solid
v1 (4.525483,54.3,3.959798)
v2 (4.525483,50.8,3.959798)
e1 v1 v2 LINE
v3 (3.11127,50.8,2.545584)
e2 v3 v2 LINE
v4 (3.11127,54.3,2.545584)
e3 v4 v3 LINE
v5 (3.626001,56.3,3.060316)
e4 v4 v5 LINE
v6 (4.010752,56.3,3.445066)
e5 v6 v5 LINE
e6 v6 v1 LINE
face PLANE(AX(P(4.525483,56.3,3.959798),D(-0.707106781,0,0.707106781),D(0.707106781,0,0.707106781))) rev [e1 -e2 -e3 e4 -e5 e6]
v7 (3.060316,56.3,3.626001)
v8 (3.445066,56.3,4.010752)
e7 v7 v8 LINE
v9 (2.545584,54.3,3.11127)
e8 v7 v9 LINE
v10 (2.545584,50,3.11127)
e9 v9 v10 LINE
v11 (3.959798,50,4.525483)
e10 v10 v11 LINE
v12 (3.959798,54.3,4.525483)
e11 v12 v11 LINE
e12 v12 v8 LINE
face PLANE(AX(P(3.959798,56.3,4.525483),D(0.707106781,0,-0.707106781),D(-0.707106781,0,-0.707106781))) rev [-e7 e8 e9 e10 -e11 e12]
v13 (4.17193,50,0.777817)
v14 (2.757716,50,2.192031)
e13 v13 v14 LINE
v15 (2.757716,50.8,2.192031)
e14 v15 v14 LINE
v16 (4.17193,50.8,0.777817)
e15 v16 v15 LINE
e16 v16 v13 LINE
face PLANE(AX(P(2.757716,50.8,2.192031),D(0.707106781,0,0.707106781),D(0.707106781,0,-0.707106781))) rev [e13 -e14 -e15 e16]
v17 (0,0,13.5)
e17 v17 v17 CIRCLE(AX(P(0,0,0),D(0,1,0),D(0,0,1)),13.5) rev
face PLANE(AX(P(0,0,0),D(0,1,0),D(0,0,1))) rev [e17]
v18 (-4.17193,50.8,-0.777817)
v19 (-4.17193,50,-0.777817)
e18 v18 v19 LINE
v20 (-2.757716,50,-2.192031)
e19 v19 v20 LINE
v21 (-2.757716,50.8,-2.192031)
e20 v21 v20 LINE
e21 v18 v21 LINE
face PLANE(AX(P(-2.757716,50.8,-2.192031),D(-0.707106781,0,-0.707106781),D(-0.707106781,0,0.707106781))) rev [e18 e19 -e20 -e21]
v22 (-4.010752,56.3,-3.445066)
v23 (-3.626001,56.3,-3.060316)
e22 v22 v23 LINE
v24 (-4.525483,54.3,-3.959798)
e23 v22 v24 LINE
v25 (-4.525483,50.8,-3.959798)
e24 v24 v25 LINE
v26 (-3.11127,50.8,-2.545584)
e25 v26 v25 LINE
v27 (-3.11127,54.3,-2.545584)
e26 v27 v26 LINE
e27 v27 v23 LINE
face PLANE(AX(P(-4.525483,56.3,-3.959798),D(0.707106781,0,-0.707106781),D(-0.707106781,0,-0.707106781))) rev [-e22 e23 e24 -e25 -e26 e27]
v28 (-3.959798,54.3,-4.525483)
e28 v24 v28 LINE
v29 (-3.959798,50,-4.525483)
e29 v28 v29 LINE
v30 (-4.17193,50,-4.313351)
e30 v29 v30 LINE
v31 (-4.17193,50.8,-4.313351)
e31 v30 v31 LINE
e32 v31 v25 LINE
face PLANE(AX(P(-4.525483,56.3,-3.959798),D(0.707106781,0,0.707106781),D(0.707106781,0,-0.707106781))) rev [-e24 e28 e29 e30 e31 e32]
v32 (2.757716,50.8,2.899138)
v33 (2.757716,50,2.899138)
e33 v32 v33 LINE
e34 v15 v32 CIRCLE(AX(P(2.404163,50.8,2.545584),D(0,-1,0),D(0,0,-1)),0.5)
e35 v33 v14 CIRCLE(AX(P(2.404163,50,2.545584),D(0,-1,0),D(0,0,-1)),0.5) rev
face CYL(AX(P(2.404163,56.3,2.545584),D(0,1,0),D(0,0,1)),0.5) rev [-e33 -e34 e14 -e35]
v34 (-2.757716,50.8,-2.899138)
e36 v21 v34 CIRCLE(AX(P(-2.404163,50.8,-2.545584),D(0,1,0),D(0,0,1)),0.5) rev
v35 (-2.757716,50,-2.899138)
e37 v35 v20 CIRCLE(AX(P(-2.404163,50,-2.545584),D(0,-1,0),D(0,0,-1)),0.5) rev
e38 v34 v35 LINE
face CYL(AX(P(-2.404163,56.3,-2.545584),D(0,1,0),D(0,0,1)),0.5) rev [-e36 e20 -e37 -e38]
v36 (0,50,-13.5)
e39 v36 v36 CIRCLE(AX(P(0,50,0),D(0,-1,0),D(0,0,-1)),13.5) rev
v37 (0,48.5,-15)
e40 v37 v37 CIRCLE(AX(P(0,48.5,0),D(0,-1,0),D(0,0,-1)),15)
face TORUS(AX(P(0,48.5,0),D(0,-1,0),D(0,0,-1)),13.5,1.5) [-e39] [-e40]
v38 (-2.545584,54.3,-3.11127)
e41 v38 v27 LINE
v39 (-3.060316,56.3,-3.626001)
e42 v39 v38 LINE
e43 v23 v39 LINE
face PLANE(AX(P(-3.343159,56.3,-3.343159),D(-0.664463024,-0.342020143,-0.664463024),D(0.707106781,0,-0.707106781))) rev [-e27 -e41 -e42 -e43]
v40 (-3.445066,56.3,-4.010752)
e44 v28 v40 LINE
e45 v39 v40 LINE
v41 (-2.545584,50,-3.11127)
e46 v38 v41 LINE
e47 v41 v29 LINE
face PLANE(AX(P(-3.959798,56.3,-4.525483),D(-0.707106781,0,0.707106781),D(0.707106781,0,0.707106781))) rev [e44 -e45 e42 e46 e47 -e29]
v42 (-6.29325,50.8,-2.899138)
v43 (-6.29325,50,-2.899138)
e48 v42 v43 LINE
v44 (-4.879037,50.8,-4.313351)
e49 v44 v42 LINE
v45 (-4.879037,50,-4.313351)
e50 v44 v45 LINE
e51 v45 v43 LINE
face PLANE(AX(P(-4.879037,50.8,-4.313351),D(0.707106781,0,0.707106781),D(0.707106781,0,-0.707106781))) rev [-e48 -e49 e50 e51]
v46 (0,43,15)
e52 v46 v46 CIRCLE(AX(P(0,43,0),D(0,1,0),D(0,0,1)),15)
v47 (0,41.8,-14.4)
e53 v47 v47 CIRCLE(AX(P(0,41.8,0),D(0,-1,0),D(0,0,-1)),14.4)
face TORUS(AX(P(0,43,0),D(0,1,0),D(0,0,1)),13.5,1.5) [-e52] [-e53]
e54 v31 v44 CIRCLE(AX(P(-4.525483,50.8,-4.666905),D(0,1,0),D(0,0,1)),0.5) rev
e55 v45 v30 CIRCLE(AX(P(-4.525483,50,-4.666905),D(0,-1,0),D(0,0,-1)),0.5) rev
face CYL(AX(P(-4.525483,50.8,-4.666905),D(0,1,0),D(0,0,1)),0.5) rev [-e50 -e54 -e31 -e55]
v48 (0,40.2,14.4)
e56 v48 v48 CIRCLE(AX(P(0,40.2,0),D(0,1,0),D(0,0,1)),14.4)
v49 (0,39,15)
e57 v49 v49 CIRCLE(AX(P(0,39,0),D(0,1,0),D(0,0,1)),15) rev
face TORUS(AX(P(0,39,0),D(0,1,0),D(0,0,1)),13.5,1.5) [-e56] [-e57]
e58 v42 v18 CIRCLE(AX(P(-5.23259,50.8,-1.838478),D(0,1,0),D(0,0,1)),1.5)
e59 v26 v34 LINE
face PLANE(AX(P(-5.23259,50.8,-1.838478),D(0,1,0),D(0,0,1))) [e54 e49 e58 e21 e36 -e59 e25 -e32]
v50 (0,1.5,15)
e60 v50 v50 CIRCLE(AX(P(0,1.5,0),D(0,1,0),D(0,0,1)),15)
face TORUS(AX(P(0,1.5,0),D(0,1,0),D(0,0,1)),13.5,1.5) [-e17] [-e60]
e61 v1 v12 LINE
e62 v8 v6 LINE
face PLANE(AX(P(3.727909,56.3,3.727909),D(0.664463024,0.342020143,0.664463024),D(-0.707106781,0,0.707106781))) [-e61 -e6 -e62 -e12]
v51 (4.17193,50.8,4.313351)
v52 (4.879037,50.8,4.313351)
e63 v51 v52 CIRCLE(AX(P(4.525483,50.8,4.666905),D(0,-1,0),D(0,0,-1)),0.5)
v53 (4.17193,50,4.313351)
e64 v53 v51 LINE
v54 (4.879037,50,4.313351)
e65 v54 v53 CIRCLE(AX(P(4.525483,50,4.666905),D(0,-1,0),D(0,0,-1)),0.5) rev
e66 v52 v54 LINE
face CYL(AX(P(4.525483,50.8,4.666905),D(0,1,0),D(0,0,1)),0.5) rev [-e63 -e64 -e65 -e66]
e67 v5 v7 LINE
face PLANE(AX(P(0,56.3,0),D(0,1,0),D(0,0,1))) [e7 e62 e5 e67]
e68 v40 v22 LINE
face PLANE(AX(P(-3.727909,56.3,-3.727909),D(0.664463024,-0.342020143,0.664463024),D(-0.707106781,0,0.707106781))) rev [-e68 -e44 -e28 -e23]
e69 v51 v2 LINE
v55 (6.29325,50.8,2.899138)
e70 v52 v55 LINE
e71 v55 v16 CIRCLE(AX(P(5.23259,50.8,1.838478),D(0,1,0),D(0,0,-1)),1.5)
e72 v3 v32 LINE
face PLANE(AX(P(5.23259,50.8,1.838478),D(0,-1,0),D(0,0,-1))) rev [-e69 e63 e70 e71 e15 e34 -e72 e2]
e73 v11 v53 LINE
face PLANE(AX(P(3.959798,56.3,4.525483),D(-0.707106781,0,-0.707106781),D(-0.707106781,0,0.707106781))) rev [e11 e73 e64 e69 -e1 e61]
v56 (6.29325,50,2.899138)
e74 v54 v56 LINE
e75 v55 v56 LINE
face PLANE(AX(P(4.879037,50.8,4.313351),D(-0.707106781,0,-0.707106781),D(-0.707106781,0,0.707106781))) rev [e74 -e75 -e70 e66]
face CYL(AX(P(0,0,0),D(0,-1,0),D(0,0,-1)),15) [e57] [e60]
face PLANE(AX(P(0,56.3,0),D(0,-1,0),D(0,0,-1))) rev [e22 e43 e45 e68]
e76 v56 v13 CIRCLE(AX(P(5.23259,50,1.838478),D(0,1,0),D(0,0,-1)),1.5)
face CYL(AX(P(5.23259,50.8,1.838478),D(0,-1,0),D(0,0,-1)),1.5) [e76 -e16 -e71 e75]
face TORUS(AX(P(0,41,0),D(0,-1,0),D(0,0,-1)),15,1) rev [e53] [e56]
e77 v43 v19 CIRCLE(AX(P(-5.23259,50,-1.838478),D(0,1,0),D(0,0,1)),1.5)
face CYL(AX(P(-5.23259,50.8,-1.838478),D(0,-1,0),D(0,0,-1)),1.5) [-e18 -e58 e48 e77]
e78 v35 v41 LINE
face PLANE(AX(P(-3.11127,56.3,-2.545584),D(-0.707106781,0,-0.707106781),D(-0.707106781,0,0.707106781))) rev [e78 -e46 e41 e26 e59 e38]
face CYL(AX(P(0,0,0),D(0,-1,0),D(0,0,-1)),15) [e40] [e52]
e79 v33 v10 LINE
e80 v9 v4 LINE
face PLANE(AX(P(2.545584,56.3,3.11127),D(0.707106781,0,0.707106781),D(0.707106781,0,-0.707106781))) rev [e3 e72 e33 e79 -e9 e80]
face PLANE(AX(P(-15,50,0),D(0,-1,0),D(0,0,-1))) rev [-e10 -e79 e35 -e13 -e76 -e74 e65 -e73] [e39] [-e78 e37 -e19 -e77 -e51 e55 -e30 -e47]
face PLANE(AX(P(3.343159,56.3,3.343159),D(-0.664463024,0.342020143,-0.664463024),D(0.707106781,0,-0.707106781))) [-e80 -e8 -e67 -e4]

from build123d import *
from OCP.BRepFilletAPI import BRepFilletAPI_MakeChamfer

# Parameters (mm, degrees)
FILLET_1_R      = 1.5
EXTRUDE_4_DEPTH = 6.3
EXTRUDE_5_DEPTH = 0.8
CHAMFER_2_SIZE  = 2
CHAMFER_2_SIZE2 = 0.727940469
FILLET_4_R      = 0.5


with BuildPart() as part:
    # Эскиз2 → Повернуть1 (revolve)
    with BuildSketch(Plane.XY, mode=Mode.PRIVATE) as revolve_1_sk:
        with BuildLine():
            Line((0, 0), (-15, 0))
            Line((-15, 0), (-15, 40))
            ThreePointArc((-15, 40), (-14, 41), (-15, 42))
            Line((-15, 42), (-15, 50))
            Line((-15, 50), (0, 50))
            Line((0, 50), (0, 0))
        make_face()
    revolve(revolve_1_sk.sketch.rotate(Axis((0, 0, 0), (0, 1, 0)), 270), axis=Axis((0, 0, 0), (0, 1, 0)))

    # Скругление1
    fillet_1_edges = [part.edges().sort_by_distance(p)[0] for p in [
        (0, 0, 15),
        (0, 40, 15),
        (0, 42, 15),
        (0, 50, 15),
    ]]
    fillet(fillet_1_edges, radius=FILLET_1_R)

    # Эскиз3 → Бобышка-Вытянуть4 (add)
    with BuildSketch(Plane(origin=(0, 50, 0), x_dir=(1, 0, 0), z_dir=(0, 1, 0))):
        Polygon((-4.5254834, 3.959797975), (-3.111269837, 2.545584412), (-2.545584412, 3.111269837), (-3.959797975, 4.5254834), align=None)
        Polygon((3.959797975, -4.5254834), (2.545584412, -3.111269837), (3.111269837, -2.545584412), (4.5254834, -3.959797975), align=None)
    extrude(amount=EXTRUDE_4_DEPTH)

    # Эскиз5 → Бобышка-Вытянуть5 (add)
    with BuildSketch(Plane(origin=(0, 50, 0), x_dir=(1, 0, 0), z_dir=(0, 1, 0))):
        with BuildLine():
            Line((-2.757716447, 2.192031022), (-4.87903679, 4.313351365))
            Line((-4.87903679, 4.313351365), (-6.293250353, 2.899137803))
            ThreePointArc((-6.293250353, 2.899137803), (-6.293250353, 0.777817459), (-4.171930009, 0.777817459))
            Line((-4.171930009, 0.777817459), (-2.757716447, 2.192031022))
        make_face()
        with BuildLine():
            Line((4.87903679, -4.313351365), (2.757716447, -2.192031022))
            Line((2.757716447, -2.192031022), (4.171930009, -0.777817459))
            ThreePointArc((4.171930009, -0.777817459), (6.293250353, -0.777817459), (6.293250353, -2.899137803))
            Line((6.293250353, -2.899137803), (4.87903679, -4.313351365))
        make_face()
    extrude(amount=EXTRUDE_5_DEPTH)

    # Фаска2: one chamfer whose edges measure the first distance from different faces: ONE call of the kernel's chamfer builder (chamfer() names one face for all edges)
    chamfer_2_edges_1 = [part.edges().sort_by_distance(p)[0] for p in [
        (-4.242640687, 56.3, -4.242640687),
    ]]
    chamfer_2_side_1 = [part.faces().sort_by_distance(p)[0] for p in [
        (-4.242640687, 53.15, -4.242640687),
    ]]
    chamfer_2_edges_2 = [part.edges().sort_by_distance(p)[0] for p in [
        (-2.828427125, 56.3, -2.828427125),
    ]]
    chamfer_2_side_2 = [part.faces().sort_by_distance(p)[0] for p in [
        (-2.828427125, 53.15, -2.828427125),
    ]]
    chamfer_2_edges_3 = [part.edges().sort_by_distance(p)[0] for p in [
        (4.242640687, 56.3, 4.242640687),
    ]]
    chamfer_2_side_3 = [part.faces().sort_by_distance(p)[0] for p in [
        (4.242640687, 53.15, 4.242640687),
    ]]
    chamfer_2_edges_4 = [part.edges().sort_by_distance(p)[0] for p in [
        (2.828427125, 56.3, 2.828427125),
    ]]
    chamfer_2_side_4 = [part.faces().sort_by_distance(p)[0] for p in [
        (2.828427125, 53.15, 2.828427125),
    ]]
    chamfer_2 = BRepFilletAPI_MakeChamfer(part.part.solid().wrapped)
    for e in chamfer_2_edges_1:
        chamfer_2.Add(CHAMFER_2_SIZE, CHAMFER_2_SIZE2, e.wrapped, chamfer_2_side_1[0].wrapped)  # the first distance lies on this face
    for e in chamfer_2_edges_2:
        chamfer_2.Add(CHAMFER_2_SIZE, CHAMFER_2_SIZE2, e.wrapped, chamfer_2_side_2[0].wrapped)  # the first distance lies on this face
    for e in chamfer_2_edges_3:
        chamfer_2.Add(CHAMFER_2_SIZE, CHAMFER_2_SIZE2, e.wrapped, chamfer_2_side_3[0].wrapped)  # the first distance lies on this face
    for e in chamfer_2_edges_4:
        chamfer_2.Add(CHAMFER_2_SIZE, CHAMFER_2_SIZE2, e.wrapped, chamfer_2_side_4[0].wrapped)  # the first distance lies on this face
    add(Compound.cast(chamfer_2.Shape()), mode=Mode.REPLACE)

    # Скругление4
    fillet_4_edges = [part.edges().sort_by_distance(p)[0] for p in [
        (3.111269837, 50.4, 2.545584412),
        (4.5254834, 50.4, 3.959797975),
        (-4.5254834, 50.4, -3.959797975),
        (-3.111269837, 50.4, -2.545584412),
    ]]
    fillet(fillet_4_edges, radius=FILLET_4_R - 0.0001)  # a hair under: the kernel refuses the full size


solid = part.part
